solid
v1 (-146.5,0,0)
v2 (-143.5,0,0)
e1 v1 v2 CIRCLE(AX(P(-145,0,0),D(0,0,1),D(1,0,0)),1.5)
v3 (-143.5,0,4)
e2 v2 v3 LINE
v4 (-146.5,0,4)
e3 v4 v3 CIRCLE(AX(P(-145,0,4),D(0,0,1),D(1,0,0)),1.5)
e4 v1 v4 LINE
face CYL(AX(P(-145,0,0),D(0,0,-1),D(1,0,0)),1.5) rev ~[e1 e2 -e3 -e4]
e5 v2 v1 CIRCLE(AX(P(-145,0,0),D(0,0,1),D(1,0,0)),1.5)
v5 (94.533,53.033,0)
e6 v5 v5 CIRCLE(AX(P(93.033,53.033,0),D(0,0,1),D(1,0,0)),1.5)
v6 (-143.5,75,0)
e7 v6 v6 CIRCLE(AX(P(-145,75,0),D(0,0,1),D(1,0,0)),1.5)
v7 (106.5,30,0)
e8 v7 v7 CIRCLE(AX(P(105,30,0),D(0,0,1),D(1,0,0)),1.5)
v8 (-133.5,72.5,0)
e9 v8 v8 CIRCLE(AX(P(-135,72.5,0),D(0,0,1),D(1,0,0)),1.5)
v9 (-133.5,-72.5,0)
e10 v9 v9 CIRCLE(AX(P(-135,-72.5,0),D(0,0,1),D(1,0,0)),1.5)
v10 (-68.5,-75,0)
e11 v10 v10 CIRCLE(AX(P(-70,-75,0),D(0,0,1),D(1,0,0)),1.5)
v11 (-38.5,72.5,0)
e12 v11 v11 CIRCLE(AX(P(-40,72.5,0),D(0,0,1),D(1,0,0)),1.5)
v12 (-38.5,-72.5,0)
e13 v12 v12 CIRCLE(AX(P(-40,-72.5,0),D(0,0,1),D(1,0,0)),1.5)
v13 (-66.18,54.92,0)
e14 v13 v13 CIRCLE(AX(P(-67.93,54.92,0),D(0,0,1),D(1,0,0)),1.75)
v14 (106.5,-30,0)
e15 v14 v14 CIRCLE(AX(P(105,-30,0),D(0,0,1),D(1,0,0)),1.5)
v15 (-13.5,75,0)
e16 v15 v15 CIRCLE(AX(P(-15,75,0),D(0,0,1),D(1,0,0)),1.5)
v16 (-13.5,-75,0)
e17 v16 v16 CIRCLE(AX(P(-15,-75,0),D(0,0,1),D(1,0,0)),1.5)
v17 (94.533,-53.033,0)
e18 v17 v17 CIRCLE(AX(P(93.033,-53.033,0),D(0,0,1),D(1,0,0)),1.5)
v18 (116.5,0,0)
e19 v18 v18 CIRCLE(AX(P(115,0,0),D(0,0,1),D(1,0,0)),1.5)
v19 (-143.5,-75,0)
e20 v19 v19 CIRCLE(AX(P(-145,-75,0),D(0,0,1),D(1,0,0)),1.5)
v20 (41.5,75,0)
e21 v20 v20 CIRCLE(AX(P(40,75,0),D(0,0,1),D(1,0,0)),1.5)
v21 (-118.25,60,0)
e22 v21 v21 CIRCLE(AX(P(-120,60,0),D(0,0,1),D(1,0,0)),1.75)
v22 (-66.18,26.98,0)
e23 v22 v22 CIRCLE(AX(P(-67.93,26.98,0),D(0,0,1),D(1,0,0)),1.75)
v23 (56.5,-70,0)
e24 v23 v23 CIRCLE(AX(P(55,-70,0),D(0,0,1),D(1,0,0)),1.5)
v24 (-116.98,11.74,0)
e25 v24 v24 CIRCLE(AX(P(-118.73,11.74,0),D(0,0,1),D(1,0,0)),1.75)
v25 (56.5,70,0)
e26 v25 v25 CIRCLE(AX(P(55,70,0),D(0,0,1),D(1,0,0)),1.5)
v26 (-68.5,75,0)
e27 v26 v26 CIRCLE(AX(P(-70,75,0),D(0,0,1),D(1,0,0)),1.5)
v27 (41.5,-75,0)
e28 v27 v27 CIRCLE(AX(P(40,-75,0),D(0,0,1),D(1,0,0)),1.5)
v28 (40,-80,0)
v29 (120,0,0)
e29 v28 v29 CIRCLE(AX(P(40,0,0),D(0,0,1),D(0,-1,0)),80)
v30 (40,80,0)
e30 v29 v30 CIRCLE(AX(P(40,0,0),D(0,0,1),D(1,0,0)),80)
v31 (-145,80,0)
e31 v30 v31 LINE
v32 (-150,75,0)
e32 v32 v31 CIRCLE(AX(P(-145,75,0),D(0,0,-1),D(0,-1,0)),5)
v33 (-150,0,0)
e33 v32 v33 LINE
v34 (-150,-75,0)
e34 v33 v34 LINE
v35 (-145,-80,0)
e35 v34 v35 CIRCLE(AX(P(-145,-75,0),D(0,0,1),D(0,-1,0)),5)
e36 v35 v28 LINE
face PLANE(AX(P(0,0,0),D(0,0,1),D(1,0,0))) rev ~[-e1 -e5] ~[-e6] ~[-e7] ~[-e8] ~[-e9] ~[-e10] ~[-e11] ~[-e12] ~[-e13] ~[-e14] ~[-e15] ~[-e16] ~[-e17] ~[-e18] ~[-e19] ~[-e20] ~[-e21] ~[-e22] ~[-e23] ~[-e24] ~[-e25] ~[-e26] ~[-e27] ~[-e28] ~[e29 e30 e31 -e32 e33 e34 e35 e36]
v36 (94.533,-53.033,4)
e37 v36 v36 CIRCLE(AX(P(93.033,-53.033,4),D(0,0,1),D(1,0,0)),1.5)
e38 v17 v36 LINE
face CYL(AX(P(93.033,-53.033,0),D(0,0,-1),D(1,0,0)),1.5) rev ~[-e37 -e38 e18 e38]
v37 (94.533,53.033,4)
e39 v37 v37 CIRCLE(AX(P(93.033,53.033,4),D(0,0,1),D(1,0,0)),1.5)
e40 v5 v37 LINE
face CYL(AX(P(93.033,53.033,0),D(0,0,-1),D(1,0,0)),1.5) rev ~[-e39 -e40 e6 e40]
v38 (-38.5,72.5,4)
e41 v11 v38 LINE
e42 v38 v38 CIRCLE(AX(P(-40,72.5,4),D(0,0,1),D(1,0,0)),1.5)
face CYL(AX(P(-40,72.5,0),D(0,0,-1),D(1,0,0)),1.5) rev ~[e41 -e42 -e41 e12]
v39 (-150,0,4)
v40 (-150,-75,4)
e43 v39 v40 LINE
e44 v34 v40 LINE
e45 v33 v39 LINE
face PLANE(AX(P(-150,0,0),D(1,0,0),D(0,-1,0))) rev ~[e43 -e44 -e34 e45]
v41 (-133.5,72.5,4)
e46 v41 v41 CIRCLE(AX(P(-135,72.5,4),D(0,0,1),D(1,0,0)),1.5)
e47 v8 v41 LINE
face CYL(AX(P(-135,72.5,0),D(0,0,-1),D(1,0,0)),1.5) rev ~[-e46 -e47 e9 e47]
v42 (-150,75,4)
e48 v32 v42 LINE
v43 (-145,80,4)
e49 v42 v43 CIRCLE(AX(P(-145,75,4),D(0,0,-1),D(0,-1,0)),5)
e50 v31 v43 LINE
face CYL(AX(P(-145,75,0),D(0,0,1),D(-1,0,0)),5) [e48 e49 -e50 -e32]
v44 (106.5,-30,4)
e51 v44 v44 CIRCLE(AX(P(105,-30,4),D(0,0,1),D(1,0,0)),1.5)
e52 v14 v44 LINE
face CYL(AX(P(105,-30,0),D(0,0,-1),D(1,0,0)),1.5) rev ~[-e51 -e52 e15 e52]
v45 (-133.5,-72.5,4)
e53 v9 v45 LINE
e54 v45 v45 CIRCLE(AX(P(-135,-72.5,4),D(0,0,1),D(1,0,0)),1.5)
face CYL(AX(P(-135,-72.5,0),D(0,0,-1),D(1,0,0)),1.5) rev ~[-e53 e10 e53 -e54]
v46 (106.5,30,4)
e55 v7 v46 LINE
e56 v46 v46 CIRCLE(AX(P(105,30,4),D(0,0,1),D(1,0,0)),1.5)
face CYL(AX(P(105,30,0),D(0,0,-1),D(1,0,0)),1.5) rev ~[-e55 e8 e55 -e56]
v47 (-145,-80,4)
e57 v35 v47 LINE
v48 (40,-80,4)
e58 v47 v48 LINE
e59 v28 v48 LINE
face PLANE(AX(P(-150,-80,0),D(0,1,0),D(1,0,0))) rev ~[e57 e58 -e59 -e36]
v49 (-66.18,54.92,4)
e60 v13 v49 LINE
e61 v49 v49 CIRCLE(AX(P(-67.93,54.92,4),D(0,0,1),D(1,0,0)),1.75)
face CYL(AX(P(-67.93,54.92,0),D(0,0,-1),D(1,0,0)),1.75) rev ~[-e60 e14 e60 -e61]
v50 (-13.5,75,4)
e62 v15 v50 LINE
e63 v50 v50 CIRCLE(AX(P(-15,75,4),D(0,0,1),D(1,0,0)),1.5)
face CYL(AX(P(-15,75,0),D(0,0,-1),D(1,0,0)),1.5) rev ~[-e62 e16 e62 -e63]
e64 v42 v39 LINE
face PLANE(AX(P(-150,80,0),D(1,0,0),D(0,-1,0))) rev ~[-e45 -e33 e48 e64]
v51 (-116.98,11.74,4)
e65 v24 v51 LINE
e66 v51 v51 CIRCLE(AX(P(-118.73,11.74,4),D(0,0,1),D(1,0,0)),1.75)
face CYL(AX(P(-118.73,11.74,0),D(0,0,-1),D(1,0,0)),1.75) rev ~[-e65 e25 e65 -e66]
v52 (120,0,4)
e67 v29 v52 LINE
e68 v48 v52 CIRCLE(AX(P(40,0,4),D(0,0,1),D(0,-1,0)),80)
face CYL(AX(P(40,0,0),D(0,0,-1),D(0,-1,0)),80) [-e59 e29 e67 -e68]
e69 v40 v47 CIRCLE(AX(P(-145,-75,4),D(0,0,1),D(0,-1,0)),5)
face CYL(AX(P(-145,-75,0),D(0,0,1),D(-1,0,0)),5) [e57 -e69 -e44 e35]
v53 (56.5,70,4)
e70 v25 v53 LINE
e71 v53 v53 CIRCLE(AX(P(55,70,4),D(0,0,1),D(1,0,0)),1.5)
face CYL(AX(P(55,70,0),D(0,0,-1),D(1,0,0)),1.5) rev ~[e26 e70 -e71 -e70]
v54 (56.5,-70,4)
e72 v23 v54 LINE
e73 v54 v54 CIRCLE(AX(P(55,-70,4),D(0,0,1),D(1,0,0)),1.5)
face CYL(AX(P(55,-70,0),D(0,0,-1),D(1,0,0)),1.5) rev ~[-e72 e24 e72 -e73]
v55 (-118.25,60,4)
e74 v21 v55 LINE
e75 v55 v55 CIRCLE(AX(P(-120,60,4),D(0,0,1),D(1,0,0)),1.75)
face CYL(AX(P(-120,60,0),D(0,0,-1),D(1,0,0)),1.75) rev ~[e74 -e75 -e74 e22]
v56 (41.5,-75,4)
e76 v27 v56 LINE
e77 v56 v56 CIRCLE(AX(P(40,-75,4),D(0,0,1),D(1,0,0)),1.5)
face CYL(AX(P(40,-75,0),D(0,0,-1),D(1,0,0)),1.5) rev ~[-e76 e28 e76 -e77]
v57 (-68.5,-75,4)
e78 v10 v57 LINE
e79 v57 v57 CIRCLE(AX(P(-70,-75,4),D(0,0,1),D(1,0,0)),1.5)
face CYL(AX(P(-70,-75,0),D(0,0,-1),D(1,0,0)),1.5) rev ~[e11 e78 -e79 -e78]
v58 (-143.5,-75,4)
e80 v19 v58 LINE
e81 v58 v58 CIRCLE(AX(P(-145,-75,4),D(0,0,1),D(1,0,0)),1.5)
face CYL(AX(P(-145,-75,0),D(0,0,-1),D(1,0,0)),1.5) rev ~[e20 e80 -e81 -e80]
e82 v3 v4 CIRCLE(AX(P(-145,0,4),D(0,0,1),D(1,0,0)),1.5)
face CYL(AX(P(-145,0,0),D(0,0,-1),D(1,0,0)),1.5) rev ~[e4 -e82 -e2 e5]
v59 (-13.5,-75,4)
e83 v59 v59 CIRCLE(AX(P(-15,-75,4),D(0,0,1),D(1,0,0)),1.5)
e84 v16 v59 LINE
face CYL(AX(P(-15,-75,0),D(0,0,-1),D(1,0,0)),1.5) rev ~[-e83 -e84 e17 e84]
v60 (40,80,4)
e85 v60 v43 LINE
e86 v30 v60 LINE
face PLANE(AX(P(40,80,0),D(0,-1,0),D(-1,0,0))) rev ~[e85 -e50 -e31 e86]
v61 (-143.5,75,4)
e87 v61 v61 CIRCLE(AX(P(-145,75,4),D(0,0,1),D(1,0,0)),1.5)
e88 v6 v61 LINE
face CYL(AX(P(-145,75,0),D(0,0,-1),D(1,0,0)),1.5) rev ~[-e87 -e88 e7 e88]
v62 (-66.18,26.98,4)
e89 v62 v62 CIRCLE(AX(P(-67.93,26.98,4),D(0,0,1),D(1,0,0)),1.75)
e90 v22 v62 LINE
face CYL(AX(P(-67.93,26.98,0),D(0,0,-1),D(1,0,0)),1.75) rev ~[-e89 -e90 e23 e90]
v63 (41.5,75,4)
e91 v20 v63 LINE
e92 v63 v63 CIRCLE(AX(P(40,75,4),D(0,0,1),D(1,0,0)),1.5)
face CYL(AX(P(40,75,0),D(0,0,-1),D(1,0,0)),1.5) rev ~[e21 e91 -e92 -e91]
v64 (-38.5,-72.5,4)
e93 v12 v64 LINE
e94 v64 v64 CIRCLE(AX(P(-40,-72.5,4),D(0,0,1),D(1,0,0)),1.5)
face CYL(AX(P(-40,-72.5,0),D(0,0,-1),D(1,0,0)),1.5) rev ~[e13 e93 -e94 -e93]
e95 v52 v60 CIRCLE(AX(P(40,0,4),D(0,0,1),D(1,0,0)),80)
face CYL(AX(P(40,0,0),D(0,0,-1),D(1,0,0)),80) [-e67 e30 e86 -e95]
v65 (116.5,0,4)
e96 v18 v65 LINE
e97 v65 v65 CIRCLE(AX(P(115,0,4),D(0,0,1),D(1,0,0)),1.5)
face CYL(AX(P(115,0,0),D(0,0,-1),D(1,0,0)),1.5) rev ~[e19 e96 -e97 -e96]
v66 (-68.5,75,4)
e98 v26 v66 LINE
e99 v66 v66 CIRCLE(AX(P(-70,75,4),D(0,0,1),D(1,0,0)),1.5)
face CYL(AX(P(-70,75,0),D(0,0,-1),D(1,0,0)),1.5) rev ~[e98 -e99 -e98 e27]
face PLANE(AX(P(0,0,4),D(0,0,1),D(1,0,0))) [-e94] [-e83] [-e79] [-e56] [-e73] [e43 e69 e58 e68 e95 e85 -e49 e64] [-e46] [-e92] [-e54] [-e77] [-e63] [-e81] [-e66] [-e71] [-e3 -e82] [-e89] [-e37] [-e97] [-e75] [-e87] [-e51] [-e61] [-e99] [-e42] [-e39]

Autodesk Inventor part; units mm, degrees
ref_plane "YZ Plane" through (0, 0, 0) normal (1, 0, 0) x (0, 1, 0)
ref_plane "XZ Plane" through (0, 0, 0) normal (0, 1, 0) x (-1, 0, 0)
ref_plane "XY Plane" through (0, 0, 0) normal (0, 0, 1) x (1, 0, 0)
sketch "Sketch1" plane through (0, 0, 0) normal (0, 0, 1) x (1, 0, 0)
  line L0 (-150, -80) -> (40, -80)
  line L1 (150, -80) -> (150, 80) construction
  line L2 (40, 80) -> (-150, 80)
  line L3 (-150, 80) -> (-150, -80)
  line L4 (-150, -80) -> (150, 80) construction
  line L5 (150, -80) -> (-150, 80) construction
  line L6 (-150, 0) -> (-107, 0) construction
  line L7 (-107, 0) -> (33.79, 0) construction
  line L8 (-7.3128, 0) -> (74.6872, 0) construction
  line L9 (33.6872, 41) -> (74.6872, 41) construction
  line L10 (74.6872, 41) -> (74.6872, 0) construction
  circle A0 centre (74.6872, 41) radius 2 construction
  circle A1 centre (74.6872, -41) radius 2 construction
  circle A2 centre (-7.3128, 41) radius 2 construction
  circle A3 centre (-7.3128, -41) radius 2 construction
  line L11 (150, 0) -> (120, 0) construction
  line L12 (120, 0) -> (120, 0)
  arc A4 (40, -80) -> (120, 0) centre (40, 0) ccw
  arc A5 (120, 0) -> (40, 80) centre (40, 0) ccw
  line L13 (120, 0) -> (115, 0) construction
  circle A6 centre (115, 0) radius 1.5
  line L14 (40, 0) -> (111.7631, 71.7631) construction
  line L15 (96.5685, -56.5685) -> (93.033, -53.033) construction
  circle A7 centre (93.033, -53.033) radius 1.5
  line L16 (40, -80) -> (40, -75) construction
  circle A8 centre (40, -75) radius 1.5
  line L17 (40, -75) -> (-15, -75) construction
  line L18 (-15, -75) -> (-70, -75) construction
  line L19 (-150, -75) -> (-145, -75) construction
  circle A9 centre (-15, -75) radius 1.5
  circle A10 centre (-70, -75) radius 1.5
  circle A11 centre (-145, -75) radius 1.5
  circle A12 centre (-145, 0) radius 1.5
  circle A13 centre (93.033, 53.033) radius 1.5
  circle A14 centre (40, 75) radius 1.5
  circle A15 centre (-15, 75) radius 1.5
  circle A16 centre (-70, 75) radius 1.5
  circle A17 centre (-145, 75) radius 1.5
  line L20 (-145, -80) -> (-145, -75) construction
  line L21 (-150, 0) -> (-145, 0)
  line L22 (120, 0) -> (105, 0) construction
  line L23 (105, -30) -> (105, 30) construction
  circle A18 centre (105, -30) radius 4 construction
  circle A19 centre (105, 30) radius 4 construction
  circle A20 centre (105, -30) radius 1.5
  circle A21 centre (105, 30) radius 1.5
  line L24 (105, 0) -> (55, 0) construction
  line L25 (55, -70) -> (55, 70) construction
  circle A22 centre (55, -70) radius 1.5
  circle A23 centre (55, -70) radius 4 construction
  line L26 (-150, 0) -> (-135, 0) construction
  line L27 (-135, -72.5) -> (-135, 72.5) construction
  circle A24 centre (-135, -72.5) radius 1.5
  circle A25 centre (-135, -72.5) radius 4 construction
  line L28 (-135, 0) -> (-40, 0) construction
  line L29 (-40, -72.5) -> (-40, 72.5) construction
  circle A26 centre (-40, -72.5) radius 4 construction
  circle A27 centre (-40, -72.5) radius 1.5
  circle A28 centre (55, 70) radius 1.5
  circle A29 centre (55, 70) radius 4 construction
  circle A30 centre (-135, 72.5) radius 1.5
  circle A31 centre (-135, 72.5) radius 4 construction
  circle A32 centre (-40, 72.5) radius 4 construction
  circle A33 centre (-40, 72.5) radius 1.5
  line L30 (-150, 60) -> (-120, 60) construction
  line L31 (-120, 80) -> (-120, 60) construction
  circle A34 centre (-120, 60) radius 1.75
  circle A35 centre (-118.73, 11.74) radius 1.75
  line L32 (-120, 60) -> (-67.93, 60) construction
  line L33 (-150, 11.74) -> (-118.73, 11.74) construction
  line L34 (-118.73, 60) -> (-118.73, 11.74) construction
  line L35 (-67.93, 60) -> (-67.93, 54.92) construction
  circle A36 centre (-67.93, 54.92) radius 1.75
  line L36 (-67.93, 54.92) -> (-67.93, 26.98) construction
  circle A37 centre (-67.93, 26.98) radius 1.75
  point P0 (0, 0)
  point P1 (120, -80)
  point P2 (120, 0)
  dimension "d0" = 300
  dimension "d1" = 160
  dimension "d4" = 43
  dimension "d6" = 140.79
  dimension "d9" = 82
  dimension "d11" = 4
  dimension "d47" = 30
  dimension "d49" = 80
  dimension "LF" = 5
  dimension "Furos" = 3
  dimension "d52" = 45
  dimension "d53" = 5
  dimension "d55" = 3
  dimension "d56" = 5
  dimension "d57" = 3
  dimension "d58" = 55
  dimension "d59" = 55
  dimension "d60" = 5
  dimension "d61" = 3
  dimension "d62" = 3
  dimension "d63" = 3
  dimension "d64" = 3
  dimension "d65" = 5
  dimension "d66" = 5
  dimension "d67" = 15
  dimension "d68" = 60
  dimension "d69" = 8
  dimension "d70" = 8
  dimension "d71" = 3
  dimension "FA" = 3
  dimension "d73" = 50
  dimension "d74" = 140
  dimension "d75" = 3
  dimension "AA" = 8
  dimension "d77" = 15
  dimension "d78" = 145
  dimension "d79" = 3
  dimension "d80" = 8
  dimension "d81" = 95
  dimension "d82" = 145
  dimension "d83" = 8
  dimension "d84" = 3
  dimension "d85" = 30
  dimension "d86" = 20
  dimension "d87" = 3.5
  dimension "d89" = 3.5
  dimension "d90" = 52.07
  dimension "d94" = 31.27
  dimension "d95" = 48.26
  dimension "d96" = 5.08
  dimension "d97" = 3.5
  dimension "d98" = 27.94
  dimension "d99" = 3.5
  dimension "d100" = 41
  dimension "d101" = 41
  dimension "d103" = 74.6872
  dimension "d104" = 82
  dimension "d105" = 41
extrude "Extrusion1" add sketch "Sketch1" along normal blind 4
fillet "Fillet1" radius 5 2 edges at (-150, -80, 2) (-150, 80, 2)
equation "\"d9\" = L_furos"
equation "\"d53\" = LF"
equation "\"d55\" = Furos"
equation "\"d56\" = LF"
equation "\"d57\" = Furos"
equation "\"d60\" = LF"
equation "\"d61\" = Furos"
equation "\"d62\" = Furos"
equation "\"d63\" = Furos"
equation "\"d64\" = Furos"
equation "\"d65\" = LF"
equation "\"d66\" = LF"
equation "\"d69\" = AA"
equation "\"d70\" = AA"
equation "\"d71\" = FA"
equation "\"d75\" = FA"
equation "\"d79\" = FA"
equation "\"d80\" = AA"
equation "\"d83\" = AA"
equation "\"d84\" = FA"
equation "\"L_furos\" = 82"
properties part number "Base_solida_Down" material "Acrilico"
